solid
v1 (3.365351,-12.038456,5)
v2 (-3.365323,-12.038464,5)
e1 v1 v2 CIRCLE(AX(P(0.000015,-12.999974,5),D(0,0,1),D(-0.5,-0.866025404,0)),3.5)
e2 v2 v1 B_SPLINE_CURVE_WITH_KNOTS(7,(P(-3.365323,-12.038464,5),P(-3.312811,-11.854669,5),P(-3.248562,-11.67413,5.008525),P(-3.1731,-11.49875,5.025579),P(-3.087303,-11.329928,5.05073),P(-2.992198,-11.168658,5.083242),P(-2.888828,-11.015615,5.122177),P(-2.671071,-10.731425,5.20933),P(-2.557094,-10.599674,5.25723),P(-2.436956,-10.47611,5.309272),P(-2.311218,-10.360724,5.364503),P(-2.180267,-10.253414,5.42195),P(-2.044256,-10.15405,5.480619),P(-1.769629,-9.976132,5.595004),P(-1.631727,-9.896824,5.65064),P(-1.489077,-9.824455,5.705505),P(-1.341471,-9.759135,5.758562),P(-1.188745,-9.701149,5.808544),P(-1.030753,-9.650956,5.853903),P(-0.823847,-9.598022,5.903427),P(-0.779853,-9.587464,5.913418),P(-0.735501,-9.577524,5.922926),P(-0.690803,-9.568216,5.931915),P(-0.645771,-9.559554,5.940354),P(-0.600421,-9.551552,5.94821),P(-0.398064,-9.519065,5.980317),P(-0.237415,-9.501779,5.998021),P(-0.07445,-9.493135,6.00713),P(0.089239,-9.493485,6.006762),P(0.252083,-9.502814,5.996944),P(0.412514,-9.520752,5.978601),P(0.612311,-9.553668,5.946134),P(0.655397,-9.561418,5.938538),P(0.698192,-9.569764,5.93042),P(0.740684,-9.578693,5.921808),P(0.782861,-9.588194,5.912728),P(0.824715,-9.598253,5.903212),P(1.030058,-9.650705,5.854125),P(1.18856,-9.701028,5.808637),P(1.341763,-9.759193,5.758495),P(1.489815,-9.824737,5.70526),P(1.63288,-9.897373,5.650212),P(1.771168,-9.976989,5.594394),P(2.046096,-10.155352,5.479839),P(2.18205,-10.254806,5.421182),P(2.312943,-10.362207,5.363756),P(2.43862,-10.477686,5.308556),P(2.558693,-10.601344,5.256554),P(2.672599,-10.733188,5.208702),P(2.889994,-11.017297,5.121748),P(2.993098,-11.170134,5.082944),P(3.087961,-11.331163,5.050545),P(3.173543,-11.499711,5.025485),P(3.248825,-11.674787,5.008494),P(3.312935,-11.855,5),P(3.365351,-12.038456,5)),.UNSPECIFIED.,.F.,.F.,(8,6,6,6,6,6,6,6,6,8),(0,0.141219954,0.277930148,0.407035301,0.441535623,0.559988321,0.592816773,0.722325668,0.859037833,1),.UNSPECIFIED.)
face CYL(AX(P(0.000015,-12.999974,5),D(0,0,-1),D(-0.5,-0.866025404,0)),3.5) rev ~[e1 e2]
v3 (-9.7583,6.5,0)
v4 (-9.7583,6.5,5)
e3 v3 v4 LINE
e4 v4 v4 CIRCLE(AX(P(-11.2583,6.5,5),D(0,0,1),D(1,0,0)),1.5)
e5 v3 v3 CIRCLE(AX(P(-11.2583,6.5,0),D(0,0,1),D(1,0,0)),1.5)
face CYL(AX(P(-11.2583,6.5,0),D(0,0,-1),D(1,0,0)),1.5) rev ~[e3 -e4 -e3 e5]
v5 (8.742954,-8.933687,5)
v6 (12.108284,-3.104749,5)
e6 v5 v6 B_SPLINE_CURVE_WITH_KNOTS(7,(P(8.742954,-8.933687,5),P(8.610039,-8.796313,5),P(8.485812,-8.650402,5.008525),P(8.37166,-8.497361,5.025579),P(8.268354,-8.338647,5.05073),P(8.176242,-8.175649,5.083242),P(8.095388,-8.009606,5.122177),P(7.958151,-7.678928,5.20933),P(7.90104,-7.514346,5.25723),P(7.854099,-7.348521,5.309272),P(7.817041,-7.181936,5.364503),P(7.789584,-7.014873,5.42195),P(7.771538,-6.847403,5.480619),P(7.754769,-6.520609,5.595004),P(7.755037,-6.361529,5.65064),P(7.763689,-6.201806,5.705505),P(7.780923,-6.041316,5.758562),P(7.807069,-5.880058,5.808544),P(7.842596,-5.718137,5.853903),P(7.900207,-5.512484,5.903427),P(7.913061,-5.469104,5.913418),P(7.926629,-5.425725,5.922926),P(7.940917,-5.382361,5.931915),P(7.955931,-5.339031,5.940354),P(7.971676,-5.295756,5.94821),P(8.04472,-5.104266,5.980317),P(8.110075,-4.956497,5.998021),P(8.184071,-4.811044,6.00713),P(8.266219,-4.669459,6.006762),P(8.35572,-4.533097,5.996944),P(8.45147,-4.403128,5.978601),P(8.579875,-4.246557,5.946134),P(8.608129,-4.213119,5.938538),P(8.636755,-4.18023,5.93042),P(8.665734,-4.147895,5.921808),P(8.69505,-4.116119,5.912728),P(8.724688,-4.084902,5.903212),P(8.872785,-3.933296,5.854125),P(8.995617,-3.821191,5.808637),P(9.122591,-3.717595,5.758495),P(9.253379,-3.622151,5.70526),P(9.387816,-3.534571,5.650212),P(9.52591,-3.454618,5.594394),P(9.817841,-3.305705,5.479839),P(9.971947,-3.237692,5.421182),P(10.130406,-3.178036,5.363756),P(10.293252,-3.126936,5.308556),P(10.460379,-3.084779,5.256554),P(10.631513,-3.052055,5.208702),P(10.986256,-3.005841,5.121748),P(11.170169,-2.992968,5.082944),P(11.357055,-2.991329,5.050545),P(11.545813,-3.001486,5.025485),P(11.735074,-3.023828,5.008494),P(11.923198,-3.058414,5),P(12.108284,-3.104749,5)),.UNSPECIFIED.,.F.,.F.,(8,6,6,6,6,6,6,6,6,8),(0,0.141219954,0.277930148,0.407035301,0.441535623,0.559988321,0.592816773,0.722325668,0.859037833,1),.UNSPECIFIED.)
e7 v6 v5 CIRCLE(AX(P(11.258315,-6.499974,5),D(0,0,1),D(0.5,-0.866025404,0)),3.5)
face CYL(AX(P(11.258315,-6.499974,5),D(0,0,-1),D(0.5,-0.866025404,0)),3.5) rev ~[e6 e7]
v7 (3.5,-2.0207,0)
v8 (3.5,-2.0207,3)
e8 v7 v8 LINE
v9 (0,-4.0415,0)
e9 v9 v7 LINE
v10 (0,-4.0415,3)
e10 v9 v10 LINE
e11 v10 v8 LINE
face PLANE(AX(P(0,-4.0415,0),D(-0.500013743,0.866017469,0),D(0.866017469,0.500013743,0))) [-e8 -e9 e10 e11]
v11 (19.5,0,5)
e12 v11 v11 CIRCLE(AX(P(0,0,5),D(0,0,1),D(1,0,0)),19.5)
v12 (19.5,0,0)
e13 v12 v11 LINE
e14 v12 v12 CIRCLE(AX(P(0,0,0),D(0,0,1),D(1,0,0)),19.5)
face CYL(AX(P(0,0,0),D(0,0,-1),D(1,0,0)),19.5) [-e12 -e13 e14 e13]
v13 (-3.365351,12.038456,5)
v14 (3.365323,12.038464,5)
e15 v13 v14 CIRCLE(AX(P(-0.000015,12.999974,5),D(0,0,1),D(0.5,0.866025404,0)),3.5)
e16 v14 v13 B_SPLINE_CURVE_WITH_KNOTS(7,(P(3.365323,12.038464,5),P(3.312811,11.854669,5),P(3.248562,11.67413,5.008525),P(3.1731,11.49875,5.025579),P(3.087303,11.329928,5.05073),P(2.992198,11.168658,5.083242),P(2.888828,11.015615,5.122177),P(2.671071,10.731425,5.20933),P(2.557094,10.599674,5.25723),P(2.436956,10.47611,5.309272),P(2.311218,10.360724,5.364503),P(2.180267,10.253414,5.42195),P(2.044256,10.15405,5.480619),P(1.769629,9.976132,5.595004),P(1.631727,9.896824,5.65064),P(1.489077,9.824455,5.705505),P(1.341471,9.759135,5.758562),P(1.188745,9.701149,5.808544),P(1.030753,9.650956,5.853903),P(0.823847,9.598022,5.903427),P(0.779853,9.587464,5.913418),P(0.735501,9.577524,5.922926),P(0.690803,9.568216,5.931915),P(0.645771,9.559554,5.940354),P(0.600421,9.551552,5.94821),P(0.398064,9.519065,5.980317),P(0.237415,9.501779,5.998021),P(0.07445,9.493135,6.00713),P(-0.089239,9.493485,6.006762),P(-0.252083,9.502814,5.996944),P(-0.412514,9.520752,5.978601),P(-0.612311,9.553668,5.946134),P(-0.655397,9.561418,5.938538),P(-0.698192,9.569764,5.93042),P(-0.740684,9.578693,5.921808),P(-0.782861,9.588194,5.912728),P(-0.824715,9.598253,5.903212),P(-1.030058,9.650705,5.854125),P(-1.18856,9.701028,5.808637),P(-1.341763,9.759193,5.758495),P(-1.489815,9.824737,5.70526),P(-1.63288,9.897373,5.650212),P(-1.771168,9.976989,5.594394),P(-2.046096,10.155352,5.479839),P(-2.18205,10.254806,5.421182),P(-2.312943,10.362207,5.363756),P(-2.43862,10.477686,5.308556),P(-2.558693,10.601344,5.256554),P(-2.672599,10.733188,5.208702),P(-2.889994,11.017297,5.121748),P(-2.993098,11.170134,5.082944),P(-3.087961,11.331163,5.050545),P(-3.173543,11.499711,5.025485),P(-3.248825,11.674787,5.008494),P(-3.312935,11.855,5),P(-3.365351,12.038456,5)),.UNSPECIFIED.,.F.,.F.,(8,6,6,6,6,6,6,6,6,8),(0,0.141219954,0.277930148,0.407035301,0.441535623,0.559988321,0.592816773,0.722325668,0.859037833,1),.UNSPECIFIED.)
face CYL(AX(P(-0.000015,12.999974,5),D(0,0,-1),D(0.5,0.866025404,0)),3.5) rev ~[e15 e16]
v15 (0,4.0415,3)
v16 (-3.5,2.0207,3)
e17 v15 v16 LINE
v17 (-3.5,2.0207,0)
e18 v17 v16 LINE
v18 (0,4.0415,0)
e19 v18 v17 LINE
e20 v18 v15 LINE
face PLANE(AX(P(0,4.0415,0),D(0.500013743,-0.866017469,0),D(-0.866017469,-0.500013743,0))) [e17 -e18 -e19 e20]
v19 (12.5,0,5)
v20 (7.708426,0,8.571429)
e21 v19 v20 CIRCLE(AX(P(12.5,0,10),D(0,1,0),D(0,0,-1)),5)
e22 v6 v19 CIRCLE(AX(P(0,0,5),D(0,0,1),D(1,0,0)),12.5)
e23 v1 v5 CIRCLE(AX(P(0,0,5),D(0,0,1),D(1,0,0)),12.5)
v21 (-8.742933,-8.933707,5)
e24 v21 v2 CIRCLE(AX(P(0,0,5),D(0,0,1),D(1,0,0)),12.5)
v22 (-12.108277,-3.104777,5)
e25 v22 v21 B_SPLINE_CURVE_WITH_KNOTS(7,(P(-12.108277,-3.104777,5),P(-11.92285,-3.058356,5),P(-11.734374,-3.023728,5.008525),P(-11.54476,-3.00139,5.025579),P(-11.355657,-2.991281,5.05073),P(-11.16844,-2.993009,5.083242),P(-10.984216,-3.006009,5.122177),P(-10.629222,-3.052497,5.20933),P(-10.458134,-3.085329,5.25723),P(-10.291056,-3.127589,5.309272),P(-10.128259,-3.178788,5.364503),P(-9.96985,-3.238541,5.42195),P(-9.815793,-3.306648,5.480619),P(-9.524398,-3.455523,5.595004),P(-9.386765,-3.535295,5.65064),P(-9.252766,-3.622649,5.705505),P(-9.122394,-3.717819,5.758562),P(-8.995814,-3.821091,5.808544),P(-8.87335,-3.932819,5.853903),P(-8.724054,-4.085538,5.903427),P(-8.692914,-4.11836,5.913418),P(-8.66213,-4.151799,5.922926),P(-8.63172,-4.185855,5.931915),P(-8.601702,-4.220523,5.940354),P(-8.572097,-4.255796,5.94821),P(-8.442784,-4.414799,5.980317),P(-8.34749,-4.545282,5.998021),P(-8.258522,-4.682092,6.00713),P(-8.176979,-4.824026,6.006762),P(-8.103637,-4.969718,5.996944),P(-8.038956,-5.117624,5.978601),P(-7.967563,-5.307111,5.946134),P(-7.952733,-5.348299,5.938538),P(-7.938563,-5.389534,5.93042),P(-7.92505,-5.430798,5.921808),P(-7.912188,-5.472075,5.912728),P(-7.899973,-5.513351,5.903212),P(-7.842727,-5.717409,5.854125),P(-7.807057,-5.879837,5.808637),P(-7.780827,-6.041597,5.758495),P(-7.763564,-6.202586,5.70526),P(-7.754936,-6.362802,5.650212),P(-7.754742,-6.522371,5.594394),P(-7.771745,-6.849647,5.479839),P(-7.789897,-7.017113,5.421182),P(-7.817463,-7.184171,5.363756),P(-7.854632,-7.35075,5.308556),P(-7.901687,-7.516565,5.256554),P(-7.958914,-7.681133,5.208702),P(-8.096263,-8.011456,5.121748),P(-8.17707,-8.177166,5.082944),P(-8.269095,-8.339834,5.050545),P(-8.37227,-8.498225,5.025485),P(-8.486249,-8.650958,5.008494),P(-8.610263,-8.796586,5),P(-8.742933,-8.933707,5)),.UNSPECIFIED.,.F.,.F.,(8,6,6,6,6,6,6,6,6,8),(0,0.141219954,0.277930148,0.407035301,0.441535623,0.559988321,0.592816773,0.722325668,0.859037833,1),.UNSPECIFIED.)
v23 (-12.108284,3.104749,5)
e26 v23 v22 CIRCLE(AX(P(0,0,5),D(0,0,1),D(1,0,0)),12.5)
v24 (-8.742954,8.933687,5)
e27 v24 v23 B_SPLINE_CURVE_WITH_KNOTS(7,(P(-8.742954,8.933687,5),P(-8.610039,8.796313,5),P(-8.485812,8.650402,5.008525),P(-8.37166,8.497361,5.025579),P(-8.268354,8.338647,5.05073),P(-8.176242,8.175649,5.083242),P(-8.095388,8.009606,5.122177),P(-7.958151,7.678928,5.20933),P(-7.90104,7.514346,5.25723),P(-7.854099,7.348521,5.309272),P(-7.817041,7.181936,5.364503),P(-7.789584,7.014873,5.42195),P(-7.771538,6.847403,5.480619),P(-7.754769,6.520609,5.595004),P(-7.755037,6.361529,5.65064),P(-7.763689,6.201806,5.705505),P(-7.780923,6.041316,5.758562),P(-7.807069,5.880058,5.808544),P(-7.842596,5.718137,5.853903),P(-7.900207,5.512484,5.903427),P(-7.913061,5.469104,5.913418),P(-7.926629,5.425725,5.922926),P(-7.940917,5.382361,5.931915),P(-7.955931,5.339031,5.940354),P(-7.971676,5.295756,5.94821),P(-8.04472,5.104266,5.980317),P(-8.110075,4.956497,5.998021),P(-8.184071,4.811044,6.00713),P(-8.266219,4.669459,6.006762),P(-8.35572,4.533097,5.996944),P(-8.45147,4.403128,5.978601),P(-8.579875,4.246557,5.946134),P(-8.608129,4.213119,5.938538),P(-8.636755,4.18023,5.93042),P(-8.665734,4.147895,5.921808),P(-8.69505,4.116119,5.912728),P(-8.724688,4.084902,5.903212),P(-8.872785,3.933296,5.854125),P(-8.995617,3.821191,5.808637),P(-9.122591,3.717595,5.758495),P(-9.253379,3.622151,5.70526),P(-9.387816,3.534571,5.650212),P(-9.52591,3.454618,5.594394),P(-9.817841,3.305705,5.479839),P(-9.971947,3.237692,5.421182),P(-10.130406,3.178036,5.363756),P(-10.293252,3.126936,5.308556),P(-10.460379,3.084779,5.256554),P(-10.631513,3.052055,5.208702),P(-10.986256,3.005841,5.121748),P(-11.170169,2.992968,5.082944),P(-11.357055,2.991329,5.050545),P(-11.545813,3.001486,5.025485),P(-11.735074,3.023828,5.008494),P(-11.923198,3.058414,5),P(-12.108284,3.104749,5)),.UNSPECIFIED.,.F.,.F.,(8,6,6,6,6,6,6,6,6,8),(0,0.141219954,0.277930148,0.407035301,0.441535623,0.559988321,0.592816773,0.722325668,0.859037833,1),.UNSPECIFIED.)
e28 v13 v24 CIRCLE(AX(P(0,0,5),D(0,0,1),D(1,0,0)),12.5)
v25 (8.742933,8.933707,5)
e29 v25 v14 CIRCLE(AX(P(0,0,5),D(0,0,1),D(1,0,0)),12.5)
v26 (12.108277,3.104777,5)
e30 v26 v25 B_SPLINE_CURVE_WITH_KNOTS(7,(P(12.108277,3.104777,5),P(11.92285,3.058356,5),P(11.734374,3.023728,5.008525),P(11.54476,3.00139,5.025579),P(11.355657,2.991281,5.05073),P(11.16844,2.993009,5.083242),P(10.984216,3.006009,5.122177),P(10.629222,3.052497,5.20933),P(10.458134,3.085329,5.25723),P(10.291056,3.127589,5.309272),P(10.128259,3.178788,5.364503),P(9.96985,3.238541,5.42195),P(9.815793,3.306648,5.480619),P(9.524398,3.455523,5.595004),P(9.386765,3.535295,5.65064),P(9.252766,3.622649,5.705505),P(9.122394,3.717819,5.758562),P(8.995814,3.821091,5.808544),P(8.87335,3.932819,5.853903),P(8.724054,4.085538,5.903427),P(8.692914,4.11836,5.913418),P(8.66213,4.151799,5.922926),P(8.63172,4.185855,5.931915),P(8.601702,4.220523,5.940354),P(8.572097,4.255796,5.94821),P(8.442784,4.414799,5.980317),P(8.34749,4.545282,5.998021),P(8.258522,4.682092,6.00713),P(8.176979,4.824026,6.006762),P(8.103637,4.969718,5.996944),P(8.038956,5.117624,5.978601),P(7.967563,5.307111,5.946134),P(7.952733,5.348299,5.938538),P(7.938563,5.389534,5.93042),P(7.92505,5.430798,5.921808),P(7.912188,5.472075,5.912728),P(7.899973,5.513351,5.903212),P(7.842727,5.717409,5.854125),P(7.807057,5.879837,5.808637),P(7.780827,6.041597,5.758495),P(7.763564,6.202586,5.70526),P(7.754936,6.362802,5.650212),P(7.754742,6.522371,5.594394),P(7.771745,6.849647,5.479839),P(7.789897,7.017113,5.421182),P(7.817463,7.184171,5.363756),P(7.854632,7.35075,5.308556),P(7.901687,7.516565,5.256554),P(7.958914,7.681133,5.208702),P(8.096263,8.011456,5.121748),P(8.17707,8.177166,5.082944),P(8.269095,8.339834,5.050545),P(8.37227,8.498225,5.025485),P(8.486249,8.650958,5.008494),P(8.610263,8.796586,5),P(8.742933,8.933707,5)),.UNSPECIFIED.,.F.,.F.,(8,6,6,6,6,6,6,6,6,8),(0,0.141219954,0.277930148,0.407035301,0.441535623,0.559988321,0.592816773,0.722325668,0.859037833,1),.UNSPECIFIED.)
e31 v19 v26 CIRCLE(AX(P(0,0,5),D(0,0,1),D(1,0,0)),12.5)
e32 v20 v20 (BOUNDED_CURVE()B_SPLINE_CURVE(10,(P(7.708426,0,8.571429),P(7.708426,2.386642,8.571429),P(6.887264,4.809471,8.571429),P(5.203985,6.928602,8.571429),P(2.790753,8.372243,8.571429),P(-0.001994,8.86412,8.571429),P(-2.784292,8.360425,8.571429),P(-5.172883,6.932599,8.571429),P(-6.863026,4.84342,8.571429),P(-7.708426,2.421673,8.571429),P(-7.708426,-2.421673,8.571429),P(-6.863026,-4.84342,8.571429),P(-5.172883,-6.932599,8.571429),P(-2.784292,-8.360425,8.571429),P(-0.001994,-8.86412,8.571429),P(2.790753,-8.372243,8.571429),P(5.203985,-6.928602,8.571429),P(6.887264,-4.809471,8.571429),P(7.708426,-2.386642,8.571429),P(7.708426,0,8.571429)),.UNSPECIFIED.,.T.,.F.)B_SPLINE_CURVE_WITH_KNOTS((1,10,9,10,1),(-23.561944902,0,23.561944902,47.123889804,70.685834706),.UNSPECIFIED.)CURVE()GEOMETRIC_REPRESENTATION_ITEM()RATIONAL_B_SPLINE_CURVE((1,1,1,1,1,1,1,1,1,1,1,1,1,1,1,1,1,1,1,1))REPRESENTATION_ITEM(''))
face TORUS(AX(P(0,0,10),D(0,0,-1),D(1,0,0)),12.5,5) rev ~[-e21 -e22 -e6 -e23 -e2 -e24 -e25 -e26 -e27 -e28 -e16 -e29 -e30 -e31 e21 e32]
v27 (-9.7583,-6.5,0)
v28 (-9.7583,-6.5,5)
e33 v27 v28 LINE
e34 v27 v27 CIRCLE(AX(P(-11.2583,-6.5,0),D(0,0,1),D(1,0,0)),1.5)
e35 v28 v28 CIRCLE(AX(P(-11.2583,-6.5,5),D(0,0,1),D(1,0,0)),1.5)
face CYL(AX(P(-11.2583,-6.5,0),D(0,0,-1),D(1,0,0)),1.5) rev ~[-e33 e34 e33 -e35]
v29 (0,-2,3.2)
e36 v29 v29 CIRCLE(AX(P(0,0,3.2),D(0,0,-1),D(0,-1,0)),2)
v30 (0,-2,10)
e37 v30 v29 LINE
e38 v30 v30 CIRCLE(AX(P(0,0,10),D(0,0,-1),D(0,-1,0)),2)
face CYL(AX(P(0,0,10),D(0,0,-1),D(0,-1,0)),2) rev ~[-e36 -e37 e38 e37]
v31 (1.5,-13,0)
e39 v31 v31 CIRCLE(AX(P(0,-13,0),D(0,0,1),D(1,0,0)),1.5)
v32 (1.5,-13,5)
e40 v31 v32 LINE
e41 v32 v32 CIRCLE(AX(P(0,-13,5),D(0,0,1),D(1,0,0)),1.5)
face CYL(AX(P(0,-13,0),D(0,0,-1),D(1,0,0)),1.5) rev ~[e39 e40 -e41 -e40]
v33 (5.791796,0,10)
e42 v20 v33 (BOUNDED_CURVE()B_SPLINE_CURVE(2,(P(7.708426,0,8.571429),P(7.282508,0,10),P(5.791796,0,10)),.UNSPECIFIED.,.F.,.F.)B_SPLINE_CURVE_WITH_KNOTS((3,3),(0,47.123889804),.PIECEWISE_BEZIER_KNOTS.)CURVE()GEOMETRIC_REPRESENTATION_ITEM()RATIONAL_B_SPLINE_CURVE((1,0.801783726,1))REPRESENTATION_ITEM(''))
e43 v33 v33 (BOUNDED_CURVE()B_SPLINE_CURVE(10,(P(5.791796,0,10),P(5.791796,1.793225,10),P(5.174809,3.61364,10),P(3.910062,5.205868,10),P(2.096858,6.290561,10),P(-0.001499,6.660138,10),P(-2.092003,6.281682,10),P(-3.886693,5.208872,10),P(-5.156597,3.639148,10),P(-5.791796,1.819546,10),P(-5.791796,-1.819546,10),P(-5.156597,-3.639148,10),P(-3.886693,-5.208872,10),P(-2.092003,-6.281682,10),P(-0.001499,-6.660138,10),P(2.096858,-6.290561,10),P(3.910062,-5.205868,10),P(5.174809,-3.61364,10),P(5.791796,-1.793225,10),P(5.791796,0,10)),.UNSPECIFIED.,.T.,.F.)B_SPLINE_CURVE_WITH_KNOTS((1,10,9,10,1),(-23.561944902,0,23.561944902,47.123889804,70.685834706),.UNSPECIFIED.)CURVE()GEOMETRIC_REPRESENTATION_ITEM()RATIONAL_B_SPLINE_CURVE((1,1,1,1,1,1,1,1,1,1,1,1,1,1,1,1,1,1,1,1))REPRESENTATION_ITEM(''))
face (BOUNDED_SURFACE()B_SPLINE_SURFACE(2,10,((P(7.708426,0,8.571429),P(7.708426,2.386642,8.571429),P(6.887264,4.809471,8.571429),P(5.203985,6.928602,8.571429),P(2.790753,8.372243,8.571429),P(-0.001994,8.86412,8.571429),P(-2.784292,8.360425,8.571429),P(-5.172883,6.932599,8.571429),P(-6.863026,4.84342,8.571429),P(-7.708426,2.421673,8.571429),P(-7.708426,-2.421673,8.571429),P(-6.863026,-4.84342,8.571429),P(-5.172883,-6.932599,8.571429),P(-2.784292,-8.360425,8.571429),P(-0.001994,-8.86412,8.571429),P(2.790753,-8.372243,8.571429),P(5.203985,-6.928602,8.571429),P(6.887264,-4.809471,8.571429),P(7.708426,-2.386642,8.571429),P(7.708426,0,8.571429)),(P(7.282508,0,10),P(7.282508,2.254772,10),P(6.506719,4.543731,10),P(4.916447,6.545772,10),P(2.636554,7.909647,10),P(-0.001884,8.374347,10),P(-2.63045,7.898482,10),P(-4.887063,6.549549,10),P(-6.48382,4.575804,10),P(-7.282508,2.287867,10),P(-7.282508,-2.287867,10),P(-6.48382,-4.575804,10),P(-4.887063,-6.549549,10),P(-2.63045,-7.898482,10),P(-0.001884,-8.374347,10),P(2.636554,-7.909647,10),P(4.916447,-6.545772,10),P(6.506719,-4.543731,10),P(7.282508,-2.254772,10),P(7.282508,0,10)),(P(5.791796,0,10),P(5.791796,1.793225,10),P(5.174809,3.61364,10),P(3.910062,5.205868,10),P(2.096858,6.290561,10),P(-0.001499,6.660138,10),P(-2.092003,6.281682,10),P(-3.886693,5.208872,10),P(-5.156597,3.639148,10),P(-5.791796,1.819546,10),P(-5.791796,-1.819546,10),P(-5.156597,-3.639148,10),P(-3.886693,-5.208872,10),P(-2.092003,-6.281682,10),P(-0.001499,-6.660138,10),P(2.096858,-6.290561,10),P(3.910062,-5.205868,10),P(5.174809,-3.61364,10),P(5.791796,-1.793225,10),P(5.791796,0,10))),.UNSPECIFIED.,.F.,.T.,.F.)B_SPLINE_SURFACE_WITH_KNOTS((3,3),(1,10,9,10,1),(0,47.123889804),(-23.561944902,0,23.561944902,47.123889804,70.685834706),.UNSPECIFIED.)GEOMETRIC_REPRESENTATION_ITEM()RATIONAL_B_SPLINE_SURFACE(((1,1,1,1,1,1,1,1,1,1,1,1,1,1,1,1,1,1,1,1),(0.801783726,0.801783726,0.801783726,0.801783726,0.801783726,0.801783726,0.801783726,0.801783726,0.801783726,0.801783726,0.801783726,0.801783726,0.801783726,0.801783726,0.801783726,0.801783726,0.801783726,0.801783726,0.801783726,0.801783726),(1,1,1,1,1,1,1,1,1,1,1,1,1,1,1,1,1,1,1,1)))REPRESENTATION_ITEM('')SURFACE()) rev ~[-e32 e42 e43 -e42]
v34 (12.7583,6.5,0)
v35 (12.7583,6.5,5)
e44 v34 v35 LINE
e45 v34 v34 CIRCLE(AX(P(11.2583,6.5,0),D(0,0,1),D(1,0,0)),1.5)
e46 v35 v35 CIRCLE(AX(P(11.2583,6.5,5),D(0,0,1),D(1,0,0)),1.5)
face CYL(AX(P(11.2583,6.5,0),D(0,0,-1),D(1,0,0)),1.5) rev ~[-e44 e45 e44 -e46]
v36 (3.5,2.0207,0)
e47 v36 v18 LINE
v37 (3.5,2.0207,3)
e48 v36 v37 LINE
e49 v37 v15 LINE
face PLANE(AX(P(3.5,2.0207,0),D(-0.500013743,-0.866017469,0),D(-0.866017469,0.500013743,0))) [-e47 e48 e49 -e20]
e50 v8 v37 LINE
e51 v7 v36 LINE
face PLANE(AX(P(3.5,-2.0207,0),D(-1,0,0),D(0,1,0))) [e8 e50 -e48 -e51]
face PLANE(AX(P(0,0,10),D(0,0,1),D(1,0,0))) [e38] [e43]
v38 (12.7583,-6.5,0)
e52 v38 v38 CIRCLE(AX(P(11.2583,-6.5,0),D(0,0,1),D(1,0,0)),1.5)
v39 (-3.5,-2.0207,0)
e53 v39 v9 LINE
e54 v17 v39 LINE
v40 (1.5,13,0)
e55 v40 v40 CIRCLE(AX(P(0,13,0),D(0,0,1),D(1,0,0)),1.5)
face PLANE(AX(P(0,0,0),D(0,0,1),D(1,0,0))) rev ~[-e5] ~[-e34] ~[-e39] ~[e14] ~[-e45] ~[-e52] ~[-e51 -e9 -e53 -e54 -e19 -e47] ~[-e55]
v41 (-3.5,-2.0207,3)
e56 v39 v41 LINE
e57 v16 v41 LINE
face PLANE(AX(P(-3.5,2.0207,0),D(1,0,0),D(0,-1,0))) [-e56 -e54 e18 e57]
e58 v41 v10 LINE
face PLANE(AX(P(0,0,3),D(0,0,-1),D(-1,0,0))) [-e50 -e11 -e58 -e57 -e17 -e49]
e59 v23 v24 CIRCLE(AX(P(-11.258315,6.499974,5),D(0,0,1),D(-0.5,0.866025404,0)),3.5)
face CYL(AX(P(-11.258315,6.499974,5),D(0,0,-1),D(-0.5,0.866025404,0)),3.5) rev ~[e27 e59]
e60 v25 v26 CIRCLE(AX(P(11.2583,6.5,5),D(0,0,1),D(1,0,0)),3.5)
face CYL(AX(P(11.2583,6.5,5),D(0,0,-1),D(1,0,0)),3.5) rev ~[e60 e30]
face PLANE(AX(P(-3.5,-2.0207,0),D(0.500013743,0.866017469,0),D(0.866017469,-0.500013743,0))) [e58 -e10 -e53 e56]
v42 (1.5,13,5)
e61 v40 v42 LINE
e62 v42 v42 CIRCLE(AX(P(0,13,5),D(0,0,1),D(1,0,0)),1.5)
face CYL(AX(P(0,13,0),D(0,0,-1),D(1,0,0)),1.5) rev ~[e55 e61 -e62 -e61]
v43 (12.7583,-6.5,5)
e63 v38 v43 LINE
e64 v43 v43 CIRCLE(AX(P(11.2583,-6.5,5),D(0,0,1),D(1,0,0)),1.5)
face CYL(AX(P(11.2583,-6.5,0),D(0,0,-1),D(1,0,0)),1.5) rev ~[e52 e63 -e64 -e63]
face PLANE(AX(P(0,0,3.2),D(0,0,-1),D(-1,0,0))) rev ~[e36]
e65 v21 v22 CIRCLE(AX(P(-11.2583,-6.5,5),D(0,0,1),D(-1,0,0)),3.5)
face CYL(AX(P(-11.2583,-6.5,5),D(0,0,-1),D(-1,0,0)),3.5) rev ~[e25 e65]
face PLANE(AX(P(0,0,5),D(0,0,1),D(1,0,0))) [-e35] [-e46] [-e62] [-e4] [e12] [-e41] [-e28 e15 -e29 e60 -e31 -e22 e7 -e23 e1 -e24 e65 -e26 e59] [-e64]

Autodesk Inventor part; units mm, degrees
ref_plane "YZ Plane" through (0, 0, 0) normal (1, 0, 0) x (0, 1, 0)
ref_plane "XZ Plane" through (0, 0, 0) normal (0, 1, 0) x (-1, 0, 0)
ref_plane "XY Plane" through (0, 0, 0) normal (0, 0, 1) x (1, 0, 0)
sketch "Skizze1" plane through (0, 0, 0) normal (0, 0, 1) x (1, 0, 0)
  circle A0 centre (-11.2583, 6.5) radius 1.5 projected
  circle A1 centre (-11.2583, -6.5) radius 1.5 projected
  circle A2 centre (0, -13) radius 1.5 projected
  circle A3 centre (11.2583, -6.5) radius 1.5 projected
  circle A4 centre (11.2583, 6.5) radius 1.5 projected
  circle A5 centre (0, 13) radius 1.5 projected
  arc A6 (14.3761, 1.8914) -> (11.9393, 3.5783) centre (12.3932, 1.6305) ccw projected
  arc A7 (14.3761, -1.8914) -> (14.3761, 1.8914) centre (0, 0) ccw projected
  arc A8 (11.9393, -3.5783) -> (14.3761, -1.8914) centre (12.3932, -1.6305) ccw projected
  arc A9 (11.9393, -3.5783) -> (9.0685, -8.5505) centre (11.2583, -6.5) ccw projected
  arc A10 (8.826, -11.5044) -> (9.0685, -8.5505) centre (7.6087, -9.9176) ccw projected
  arc A11 (5.5501, -13.3958) -> (8.826, -11.5044) centre (0, 0) ccw projected
  arc A12 (2.8707, -12.1288) -> (5.5501, -13.3958) centre (4.7846, -11.5481) ccw projected
  arc A13 (2.8707, -12.1288) -> (-2.8707, -12.1288) centre (0, -13) ccw projected
  arc A14 (-5.5501, -13.3958) -> (-2.8707, -12.1288) centre (-4.7846, -11.5481) ccw projected
  arc A15 (-8.826, -11.5044) -> (-5.5501, -13.3958) centre (0, 0) ccw projected
  arc A16 (-9.0685, -8.5505) -> (-8.826, -11.5044) centre (-7.6087, -9.9176) ccw projected
  arc A17 (-9.0685, -8.5505) -> (-11.9393, -3.5783) centre (-11.2583, -6.5) ccw projected
  arc A18 (-14.3761, -1.8914) -> (-11.9393, -3.5783) centre (-12.3932, -1.6305) ccw projected
  arc A19 (-14.3761, 1.8914) -> (-14.3761, -1.8914) centre (0, 0) ccw projected
  arc A20 (-11.9393, 3.5783) -> (-14.3761, 1.8914) centre (-12.3932, 1.6305) ccw projected
  arc A21 (-11.9393, 3.5783) -> (-9.0685, 8.5505) centre (-11.2583, 6.5) ccw projected
  arc A22 (-8.826, 11.5044) -> (-9.0685, 8.5505) centre (-7.6087, 9.9176) ccw projected
  arc A23 (-5.5501, 13.3958) -> (-8.826, 11.5044) centre (0, 0) ccw projected
  arc A24 (-2.8707, 12.1288) -> (-5.5501, 13.3958) centre (-4.7846, 11.5481) ccw projected
  arc A25 (-2.8707, 12.1288) -> (2.8707, 12.1288) centre (0, 13) ccw projected
  arc A26 (5.5501, 13.3958) -> (2.8707, 12.1288) centre (4.7846, 11.5481) ccw projected
  arc A27 (8.826, 11.5044) -> (5.5501, 13.3958) centre (0, 0) ccw projected
  arc A28 (9.0685, 8.5505) -> (8.826, 11.5044) centre (7.6087, 9.9176) ccw projected
  arc A29 (9.0685, 8.5505) -> (11.9393, 3.5783) centre (11.2583, 6.5) ccw projected
  circle A30 centre (0, 0) radius 17.5 projected
  circle A31 centre (0, 0) radius 19.5
  point P0 (0, 0)
  dimension "d0" = 39
extrude "Extrusion1" add sketch "Skizze1" along normal blind 5 contours A7 A8 A9 A10 A11 A12 A13 A14 A15 A16 A17 A18 A19 A20 A21 A22 A23 A24 A25 A26 A27 A28 A29 A6 | A30 | A31
sketch "Skizze2" plane through (0, 0, 5) normal (0, 0, 1) x (1, 0, 0)
  circle A0 centre (0, 0) radius 7.5
  dimension "d3" = 15
extrude "Extrusion2" add sketch "Skizze2" along normal blind 5
sketch "Skizze6" plane through (0, 0, 5) normal (0, 0, 1) x (1, 0, 0)
  circle A0 centre (0, 0) radius 7.5 projected
  circle A1 centre (0, 13) radius 1.5 projected
  circle A2 centre (11.2583, 6.5) radius 1.5 projected
  circle A3 centre (11.2583, -6.5) radius 1.5 projected
  circle A4 centre (0, -13) radius 1.5 projected
  circle A5 centre (-11.2583, -6.5) radius 1.5 projected
  circle A6 centre (-11.2583, 6.5) radius 1.5 projected
  circle A7 centre (0, 0) radius 19.5 projected
  circle A8 centre (11.2583, 6.5) radius 3.5
  dimension "d20" = 7
fillet "Rundung1" radius 5 1 edges at (-7.5, 0, 5)
fillet "Rundung2" radius 2 1 edges at (-7.5, 0, 10)
sketch "Skizze3" plane through (0, 0, 0) normal (0, 0, -1) x (-1, 0, 0)
  line L0 (0, -4.0415) -> (-3.5, -2.0207)
  line L1 (-3.5, -2.0207) -> (-3.5, 2.0207)
  line L2 (-3.5, 2.0207) -> (0, 4.0415)
  line L3 (0, 4.0415) -> (3.5, 2.0207)
  line L4 (3.5, 2.0207) -> (3.5, -2.0207)
  line L5 (3.5, -2.0207) -> (0, -4.0415)
  point P0 (0, 0)
  point P1 (0, 0)
  dimension "d8" = 7
sketch "Skizze4" plane through (0, 0, 10) normal (0, 0, 1) x (1, 0, 0)
  point P0 (0, 0)
hole "Bohrung1" at (0, 0, 10) direction (0, 0, -1) diameter 4 end through all
extrude "Extrusion3" cut sketch "Skizze3" against normal blind 3
sketch "Skizze5" plane through (0, 0, 3) normal (0, 0, -1) x (-1, 0, 0)
  circle A0 centre (0, 0) radius 2 projected
  circle A1 centre (0, 0) radius 2 projected
extrude "Extrusion4" add sketch "Skizze5" against normal blind 0.2
extrude "Extrusion5" cut sketch "Skizze6" along normal blind 10 contours A2 | A8
pattern_circular "Runde Anordnung1" count 6 over 360 about axis through (0, 0, -46.0535) along (0, 0, 1) of "Extrusion5"
properties part number "GripperMountPlatehock" material "ABS-Kunststoff"
